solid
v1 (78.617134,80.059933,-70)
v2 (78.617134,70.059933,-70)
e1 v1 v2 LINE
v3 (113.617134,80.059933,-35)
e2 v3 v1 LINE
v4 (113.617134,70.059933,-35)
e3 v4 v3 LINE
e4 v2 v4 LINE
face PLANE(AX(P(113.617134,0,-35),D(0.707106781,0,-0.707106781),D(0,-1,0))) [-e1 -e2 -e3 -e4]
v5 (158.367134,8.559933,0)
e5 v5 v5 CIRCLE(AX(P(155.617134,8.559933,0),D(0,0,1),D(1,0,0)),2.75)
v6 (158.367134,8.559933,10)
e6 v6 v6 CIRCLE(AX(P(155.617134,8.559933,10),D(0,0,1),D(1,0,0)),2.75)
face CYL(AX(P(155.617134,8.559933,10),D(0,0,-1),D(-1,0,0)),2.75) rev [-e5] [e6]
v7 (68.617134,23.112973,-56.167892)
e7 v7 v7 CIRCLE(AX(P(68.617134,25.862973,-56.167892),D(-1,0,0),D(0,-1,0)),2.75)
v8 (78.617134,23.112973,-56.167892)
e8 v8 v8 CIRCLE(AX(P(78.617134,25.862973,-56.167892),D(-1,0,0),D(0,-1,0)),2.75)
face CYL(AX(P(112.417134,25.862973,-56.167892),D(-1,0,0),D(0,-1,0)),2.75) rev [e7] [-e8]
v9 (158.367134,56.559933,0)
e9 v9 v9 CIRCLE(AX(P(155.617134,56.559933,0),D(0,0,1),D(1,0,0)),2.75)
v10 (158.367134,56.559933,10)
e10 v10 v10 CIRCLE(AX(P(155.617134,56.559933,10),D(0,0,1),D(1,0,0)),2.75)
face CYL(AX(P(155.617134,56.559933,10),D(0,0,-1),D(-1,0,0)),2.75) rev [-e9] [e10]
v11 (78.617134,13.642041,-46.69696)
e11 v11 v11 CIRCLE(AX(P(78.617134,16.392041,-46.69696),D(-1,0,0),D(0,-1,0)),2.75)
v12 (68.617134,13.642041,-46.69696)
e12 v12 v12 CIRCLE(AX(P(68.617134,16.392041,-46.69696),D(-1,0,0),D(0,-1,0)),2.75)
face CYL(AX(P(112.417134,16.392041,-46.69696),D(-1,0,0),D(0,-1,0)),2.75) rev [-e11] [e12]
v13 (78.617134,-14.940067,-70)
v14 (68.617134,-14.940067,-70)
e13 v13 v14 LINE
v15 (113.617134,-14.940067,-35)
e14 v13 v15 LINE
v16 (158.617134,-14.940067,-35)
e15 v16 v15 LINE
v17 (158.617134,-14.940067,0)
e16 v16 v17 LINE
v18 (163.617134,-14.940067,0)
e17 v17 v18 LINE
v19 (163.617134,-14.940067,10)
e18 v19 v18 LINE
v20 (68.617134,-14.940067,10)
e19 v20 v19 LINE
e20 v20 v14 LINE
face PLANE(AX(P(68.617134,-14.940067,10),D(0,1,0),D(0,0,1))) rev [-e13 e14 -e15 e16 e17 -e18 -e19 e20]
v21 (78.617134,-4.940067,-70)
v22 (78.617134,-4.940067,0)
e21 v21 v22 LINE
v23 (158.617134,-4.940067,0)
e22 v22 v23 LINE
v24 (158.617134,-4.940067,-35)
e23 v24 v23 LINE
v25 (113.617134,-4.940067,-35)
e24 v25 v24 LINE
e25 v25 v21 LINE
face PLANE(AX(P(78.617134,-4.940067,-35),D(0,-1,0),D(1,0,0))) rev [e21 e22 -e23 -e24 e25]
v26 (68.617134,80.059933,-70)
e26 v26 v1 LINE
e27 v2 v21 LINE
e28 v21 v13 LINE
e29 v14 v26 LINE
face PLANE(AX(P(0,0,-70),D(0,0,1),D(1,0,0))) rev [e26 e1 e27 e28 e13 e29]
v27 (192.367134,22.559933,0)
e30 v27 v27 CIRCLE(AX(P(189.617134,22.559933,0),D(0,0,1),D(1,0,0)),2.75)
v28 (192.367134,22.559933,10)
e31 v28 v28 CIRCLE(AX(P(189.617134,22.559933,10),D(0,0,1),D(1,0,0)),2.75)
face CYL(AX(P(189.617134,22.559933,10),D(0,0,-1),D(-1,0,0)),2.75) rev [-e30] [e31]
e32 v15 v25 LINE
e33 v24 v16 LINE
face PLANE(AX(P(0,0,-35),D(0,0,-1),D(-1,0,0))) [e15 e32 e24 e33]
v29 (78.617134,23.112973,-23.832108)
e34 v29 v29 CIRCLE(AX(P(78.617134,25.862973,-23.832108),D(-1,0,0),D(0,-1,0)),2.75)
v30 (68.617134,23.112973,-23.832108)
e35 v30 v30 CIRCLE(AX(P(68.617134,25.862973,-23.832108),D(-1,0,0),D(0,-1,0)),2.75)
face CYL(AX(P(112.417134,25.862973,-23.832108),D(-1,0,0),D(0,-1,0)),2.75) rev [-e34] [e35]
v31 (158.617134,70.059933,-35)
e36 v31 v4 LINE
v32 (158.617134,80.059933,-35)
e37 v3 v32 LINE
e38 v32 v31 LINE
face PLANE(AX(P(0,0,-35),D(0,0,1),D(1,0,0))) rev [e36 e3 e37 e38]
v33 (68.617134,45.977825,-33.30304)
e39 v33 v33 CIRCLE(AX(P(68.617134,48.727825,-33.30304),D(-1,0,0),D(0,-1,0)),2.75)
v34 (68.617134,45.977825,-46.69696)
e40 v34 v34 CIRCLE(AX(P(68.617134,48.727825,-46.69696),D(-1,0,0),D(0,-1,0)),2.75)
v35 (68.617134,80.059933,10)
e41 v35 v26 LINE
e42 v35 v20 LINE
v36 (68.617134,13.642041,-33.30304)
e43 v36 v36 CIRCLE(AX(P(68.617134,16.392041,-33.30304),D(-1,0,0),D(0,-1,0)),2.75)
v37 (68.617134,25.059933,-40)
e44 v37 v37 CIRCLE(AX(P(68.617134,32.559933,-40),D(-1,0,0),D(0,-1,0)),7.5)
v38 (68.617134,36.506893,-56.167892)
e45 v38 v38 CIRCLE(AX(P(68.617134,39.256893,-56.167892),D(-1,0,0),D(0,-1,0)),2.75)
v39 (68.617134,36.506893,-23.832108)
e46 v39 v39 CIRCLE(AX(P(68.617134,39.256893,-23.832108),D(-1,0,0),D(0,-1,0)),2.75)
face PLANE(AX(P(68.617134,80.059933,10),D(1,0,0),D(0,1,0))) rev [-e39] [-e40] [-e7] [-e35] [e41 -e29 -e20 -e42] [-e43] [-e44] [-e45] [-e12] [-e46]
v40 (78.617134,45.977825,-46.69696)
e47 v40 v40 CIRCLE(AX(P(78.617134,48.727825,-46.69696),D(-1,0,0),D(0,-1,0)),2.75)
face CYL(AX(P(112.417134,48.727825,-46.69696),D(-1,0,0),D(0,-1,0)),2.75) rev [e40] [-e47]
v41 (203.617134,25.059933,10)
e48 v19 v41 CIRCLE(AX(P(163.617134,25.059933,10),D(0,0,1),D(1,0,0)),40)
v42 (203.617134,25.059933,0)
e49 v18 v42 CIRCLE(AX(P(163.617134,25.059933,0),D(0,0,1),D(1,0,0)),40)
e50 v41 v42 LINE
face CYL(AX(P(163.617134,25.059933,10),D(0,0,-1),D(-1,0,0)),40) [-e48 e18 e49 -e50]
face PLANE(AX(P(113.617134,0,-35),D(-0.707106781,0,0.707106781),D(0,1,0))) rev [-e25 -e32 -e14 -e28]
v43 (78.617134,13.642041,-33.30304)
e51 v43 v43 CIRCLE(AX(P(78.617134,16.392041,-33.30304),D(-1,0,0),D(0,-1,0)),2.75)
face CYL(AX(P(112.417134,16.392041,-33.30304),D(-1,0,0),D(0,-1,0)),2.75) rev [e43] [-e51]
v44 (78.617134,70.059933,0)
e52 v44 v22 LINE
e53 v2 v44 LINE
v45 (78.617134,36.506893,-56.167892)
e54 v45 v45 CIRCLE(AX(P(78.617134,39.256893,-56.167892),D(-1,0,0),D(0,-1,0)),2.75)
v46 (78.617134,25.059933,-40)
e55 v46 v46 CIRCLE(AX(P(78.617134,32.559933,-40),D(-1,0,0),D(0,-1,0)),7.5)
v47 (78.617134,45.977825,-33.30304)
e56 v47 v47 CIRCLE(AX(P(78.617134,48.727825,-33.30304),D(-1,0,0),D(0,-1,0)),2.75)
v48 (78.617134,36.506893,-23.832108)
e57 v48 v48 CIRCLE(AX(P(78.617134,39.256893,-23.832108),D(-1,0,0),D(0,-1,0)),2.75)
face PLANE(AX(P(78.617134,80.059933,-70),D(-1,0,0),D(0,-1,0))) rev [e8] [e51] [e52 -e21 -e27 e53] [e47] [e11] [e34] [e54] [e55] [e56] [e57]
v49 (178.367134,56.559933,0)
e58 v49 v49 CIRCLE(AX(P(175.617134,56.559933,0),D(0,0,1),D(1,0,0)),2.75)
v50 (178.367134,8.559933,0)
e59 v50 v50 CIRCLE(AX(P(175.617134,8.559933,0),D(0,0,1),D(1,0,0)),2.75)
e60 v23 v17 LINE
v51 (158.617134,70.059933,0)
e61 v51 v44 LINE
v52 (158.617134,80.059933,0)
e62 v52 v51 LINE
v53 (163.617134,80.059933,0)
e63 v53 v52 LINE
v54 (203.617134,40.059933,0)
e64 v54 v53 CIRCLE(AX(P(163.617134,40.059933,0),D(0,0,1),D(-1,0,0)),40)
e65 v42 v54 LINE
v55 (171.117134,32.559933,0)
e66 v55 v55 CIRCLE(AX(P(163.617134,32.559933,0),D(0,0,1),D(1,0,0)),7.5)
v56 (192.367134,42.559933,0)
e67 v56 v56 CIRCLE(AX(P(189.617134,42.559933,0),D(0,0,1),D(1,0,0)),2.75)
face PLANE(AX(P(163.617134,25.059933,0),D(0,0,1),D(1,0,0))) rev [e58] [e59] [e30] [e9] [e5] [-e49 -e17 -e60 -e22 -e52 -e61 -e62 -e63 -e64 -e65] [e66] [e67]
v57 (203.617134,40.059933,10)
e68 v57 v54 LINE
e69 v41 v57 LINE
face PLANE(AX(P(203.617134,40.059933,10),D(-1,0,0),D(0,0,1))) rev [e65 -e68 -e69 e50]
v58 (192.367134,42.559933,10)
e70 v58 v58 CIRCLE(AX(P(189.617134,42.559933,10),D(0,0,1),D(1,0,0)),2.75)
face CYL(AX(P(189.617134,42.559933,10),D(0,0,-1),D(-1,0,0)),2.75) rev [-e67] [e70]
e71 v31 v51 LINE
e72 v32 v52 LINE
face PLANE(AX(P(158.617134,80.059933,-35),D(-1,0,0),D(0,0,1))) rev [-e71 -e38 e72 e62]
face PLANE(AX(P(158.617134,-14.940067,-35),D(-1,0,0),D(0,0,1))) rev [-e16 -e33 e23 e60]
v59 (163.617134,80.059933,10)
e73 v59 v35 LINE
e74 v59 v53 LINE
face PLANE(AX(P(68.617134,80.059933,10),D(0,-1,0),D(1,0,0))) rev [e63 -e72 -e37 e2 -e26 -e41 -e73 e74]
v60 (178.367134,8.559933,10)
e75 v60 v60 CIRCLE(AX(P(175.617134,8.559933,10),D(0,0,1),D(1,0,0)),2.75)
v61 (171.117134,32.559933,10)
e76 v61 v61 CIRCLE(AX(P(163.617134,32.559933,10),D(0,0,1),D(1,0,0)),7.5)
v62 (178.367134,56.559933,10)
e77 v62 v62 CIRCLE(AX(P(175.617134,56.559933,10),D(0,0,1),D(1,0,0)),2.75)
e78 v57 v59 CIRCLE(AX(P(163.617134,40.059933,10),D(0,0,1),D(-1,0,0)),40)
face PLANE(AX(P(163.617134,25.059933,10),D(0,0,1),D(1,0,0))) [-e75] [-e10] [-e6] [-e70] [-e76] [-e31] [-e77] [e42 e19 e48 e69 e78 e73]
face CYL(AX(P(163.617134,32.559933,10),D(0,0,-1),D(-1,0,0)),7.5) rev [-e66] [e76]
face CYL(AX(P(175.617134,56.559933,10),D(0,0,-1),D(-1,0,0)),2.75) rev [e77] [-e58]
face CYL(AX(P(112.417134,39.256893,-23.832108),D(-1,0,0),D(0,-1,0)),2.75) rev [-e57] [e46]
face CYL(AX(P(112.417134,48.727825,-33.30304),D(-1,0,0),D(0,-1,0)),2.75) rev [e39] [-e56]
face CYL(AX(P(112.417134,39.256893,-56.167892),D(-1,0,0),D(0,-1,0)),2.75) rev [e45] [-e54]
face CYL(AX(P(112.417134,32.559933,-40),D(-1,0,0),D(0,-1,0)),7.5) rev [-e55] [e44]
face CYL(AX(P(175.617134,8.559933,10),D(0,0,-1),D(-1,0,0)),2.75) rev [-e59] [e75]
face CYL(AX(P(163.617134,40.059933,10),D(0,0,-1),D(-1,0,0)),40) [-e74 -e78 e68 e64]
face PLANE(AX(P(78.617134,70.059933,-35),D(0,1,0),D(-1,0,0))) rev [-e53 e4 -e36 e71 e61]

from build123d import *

# Parameters (mm, degrees)
SKETCH3_R           = 7.5
SKETCH3_R_2         = 2.75
BOSS_EXTRUDE1_DEPTH = 10
SKETCH4_W           = 10
SKETCH4_H           = 95
BOSS_EXTRUDE2_DEPTH = 70
SKETCH5_W           = 80
SKETCH5_H           = 10
BOSS_EXTRUDE3_DEPTH = 35
SKETCH8_R           = 7.5
SKETCH8_R_2         = 2.75
CUT_EXTRUDE2_DEPTH  = 43.8
CHAMFER1_SIZE       = 35


with BuildPart() as part:
    # Sketch3 → Boss-Extrude1 (new body)
    with BuildSketch(Plane.XY):
        with BuildLine():
            Line((68.617133813, 80.05993294), (163.617133813, 80.05993294))
            ThreePointArc((163.617133813, 80.05993294), (191.90140506, 68.344204188), (203.617133813, 40.05993294))
            Line((203.617133813, 40.05993294), (203.617133813, 25.05993294))
            ThreePointArc((203.617133813, 25.05993294), (191.90140506, -3.224338307), (163.617133813, -14.94006706))
            Line((163.617133813, -14.94006706), (68.617133813, -14.94006706))
            Line((68.617133813, -14.94006706), (68.617133813, 80.05993294))
        make_face()
        with Locations((163.617133813, 32.55993294)):
            Circle(SKETCH3_R, mode=Mode.SUBTRACT)
        with Locations((189.617133813, 42.55993294)):
            Circle(SKETCH3_R_2, mode=Mode.SUBTRACT)
        with Locations((155.617133813, 56.55993294)):
            Circle(SKETCH3_R_2, mode=Mode.SUBTRACT)
        with Locations((175.617133813, 56.55993294)):
            Circle(SKETCH3_R_2, mode=Mode.SUBTRACT)
        with Locations((155.617133813, 8.55993294)):
            Circle(SKETCH3_R_2, mode=Mode.SUBTRACT)
        with Locations((175.617133813, 8.55993294)):
            Circle(SKETCH3_R_2, mode=Mode.SUBTRACT)
        with Locations((189.617133813, 22.55993294)):
            Circle(SKETCH3_R_2, mode=Mode.SUBTRACT)
    extrude(amount=BOSS_EXTRUDE1_DEPTH)

    # Sketch4 → Boss-Extrude2 (add)
    with BuildSketch(Plane(origin=(0, 0, 0), x_dir=(-1, 0, 0), z_dir=(0, 0, -1))):
        with Locations((-73.617133813, 32.55993294)):
            Rectangle(SKETCH4_W, SKETCH4_H)
    extrude(amount=BOSS_EXTRUDE2_DEPTH)

    # Sketch5 → Boss-Extrude3 (add)
    with BuildSketch(Plane(origin=(0, 0, 0), x_dir=(-1, 0, 0), z_dir=(0, 0, -1))):
        with Locations((-118.617133813, 75.05993294)):
            Rectangle(SKETCH5_W, SKETCH5_H)
        with Locations((-118.617133813, -9.94006706)):
            Rectangle(SKETCH5_W, SKETCH5_H)
    extrude(amount=BOSS_EXTRUDE3_DEPTH)

    # Sketch8 → Cut-Extrude2 (cut)
    with BuildSketch(Plane.ZY.offset(-68.617133813)):
        with Locations(Location((-40, 32.55993294, 0), (0, 0, 270))):
            Circle(SKETCH8_R)
        with Locations(Location((-56.167891819, 25.862972874, 0), (0, 0, 270))):
            Circle(SKETCH8_R_2)
        with Locations(Location((-56.167891819, 39.256893006, 0), (0, 0, 270))):
            Circle(SKETCH8_R_2)
        with Locations(Location((-46.696960066, 48.727824759, 0), (0, 0, 270))):
            Circle(SKETCH8_R_2)
        with Locations(Location((-33.303039934, 48.727824759, 0), (0, 0, 270))):
            Circle(SKETCH8_R_2)
        with Locations(Location((-23.832108181, 39.256893006, 0), (0, 0, 270))):
            Circle(SKETCH8_R_2)
        with Locations(Location((-23.832108181, 25.862972874, 0), (0, 0, 270))):
            Circle(SKETCH8_R_2)
        with Locations(Location((-33.303039934, 16.392041121, 0), (0, 0, 270))):
            Circle(SKETCH8_R_2)
        with Locations(Location((-46.696960066, 16.392041121, 0), (0, 0, 270))):
            Circle(SKETCH8_R_2)
    extrude(amount=-CUT_EXTRUDE2_DEPTH, mode=Mode.SUBTRACT)

    # Chamfer1
    chamfer1_edges = [part.edges().sort_by_distance(p)[0] for p in [
        (78.617133813, 75.05993294, -35),
        (78.617133813, -9.94006706, -35),
    ]]
    chamfer(chamfer1_edges, length=CHAMFER1_SIZE - 0.0001)  # a hair under: the kernel refuses the full size


solid = part.part
